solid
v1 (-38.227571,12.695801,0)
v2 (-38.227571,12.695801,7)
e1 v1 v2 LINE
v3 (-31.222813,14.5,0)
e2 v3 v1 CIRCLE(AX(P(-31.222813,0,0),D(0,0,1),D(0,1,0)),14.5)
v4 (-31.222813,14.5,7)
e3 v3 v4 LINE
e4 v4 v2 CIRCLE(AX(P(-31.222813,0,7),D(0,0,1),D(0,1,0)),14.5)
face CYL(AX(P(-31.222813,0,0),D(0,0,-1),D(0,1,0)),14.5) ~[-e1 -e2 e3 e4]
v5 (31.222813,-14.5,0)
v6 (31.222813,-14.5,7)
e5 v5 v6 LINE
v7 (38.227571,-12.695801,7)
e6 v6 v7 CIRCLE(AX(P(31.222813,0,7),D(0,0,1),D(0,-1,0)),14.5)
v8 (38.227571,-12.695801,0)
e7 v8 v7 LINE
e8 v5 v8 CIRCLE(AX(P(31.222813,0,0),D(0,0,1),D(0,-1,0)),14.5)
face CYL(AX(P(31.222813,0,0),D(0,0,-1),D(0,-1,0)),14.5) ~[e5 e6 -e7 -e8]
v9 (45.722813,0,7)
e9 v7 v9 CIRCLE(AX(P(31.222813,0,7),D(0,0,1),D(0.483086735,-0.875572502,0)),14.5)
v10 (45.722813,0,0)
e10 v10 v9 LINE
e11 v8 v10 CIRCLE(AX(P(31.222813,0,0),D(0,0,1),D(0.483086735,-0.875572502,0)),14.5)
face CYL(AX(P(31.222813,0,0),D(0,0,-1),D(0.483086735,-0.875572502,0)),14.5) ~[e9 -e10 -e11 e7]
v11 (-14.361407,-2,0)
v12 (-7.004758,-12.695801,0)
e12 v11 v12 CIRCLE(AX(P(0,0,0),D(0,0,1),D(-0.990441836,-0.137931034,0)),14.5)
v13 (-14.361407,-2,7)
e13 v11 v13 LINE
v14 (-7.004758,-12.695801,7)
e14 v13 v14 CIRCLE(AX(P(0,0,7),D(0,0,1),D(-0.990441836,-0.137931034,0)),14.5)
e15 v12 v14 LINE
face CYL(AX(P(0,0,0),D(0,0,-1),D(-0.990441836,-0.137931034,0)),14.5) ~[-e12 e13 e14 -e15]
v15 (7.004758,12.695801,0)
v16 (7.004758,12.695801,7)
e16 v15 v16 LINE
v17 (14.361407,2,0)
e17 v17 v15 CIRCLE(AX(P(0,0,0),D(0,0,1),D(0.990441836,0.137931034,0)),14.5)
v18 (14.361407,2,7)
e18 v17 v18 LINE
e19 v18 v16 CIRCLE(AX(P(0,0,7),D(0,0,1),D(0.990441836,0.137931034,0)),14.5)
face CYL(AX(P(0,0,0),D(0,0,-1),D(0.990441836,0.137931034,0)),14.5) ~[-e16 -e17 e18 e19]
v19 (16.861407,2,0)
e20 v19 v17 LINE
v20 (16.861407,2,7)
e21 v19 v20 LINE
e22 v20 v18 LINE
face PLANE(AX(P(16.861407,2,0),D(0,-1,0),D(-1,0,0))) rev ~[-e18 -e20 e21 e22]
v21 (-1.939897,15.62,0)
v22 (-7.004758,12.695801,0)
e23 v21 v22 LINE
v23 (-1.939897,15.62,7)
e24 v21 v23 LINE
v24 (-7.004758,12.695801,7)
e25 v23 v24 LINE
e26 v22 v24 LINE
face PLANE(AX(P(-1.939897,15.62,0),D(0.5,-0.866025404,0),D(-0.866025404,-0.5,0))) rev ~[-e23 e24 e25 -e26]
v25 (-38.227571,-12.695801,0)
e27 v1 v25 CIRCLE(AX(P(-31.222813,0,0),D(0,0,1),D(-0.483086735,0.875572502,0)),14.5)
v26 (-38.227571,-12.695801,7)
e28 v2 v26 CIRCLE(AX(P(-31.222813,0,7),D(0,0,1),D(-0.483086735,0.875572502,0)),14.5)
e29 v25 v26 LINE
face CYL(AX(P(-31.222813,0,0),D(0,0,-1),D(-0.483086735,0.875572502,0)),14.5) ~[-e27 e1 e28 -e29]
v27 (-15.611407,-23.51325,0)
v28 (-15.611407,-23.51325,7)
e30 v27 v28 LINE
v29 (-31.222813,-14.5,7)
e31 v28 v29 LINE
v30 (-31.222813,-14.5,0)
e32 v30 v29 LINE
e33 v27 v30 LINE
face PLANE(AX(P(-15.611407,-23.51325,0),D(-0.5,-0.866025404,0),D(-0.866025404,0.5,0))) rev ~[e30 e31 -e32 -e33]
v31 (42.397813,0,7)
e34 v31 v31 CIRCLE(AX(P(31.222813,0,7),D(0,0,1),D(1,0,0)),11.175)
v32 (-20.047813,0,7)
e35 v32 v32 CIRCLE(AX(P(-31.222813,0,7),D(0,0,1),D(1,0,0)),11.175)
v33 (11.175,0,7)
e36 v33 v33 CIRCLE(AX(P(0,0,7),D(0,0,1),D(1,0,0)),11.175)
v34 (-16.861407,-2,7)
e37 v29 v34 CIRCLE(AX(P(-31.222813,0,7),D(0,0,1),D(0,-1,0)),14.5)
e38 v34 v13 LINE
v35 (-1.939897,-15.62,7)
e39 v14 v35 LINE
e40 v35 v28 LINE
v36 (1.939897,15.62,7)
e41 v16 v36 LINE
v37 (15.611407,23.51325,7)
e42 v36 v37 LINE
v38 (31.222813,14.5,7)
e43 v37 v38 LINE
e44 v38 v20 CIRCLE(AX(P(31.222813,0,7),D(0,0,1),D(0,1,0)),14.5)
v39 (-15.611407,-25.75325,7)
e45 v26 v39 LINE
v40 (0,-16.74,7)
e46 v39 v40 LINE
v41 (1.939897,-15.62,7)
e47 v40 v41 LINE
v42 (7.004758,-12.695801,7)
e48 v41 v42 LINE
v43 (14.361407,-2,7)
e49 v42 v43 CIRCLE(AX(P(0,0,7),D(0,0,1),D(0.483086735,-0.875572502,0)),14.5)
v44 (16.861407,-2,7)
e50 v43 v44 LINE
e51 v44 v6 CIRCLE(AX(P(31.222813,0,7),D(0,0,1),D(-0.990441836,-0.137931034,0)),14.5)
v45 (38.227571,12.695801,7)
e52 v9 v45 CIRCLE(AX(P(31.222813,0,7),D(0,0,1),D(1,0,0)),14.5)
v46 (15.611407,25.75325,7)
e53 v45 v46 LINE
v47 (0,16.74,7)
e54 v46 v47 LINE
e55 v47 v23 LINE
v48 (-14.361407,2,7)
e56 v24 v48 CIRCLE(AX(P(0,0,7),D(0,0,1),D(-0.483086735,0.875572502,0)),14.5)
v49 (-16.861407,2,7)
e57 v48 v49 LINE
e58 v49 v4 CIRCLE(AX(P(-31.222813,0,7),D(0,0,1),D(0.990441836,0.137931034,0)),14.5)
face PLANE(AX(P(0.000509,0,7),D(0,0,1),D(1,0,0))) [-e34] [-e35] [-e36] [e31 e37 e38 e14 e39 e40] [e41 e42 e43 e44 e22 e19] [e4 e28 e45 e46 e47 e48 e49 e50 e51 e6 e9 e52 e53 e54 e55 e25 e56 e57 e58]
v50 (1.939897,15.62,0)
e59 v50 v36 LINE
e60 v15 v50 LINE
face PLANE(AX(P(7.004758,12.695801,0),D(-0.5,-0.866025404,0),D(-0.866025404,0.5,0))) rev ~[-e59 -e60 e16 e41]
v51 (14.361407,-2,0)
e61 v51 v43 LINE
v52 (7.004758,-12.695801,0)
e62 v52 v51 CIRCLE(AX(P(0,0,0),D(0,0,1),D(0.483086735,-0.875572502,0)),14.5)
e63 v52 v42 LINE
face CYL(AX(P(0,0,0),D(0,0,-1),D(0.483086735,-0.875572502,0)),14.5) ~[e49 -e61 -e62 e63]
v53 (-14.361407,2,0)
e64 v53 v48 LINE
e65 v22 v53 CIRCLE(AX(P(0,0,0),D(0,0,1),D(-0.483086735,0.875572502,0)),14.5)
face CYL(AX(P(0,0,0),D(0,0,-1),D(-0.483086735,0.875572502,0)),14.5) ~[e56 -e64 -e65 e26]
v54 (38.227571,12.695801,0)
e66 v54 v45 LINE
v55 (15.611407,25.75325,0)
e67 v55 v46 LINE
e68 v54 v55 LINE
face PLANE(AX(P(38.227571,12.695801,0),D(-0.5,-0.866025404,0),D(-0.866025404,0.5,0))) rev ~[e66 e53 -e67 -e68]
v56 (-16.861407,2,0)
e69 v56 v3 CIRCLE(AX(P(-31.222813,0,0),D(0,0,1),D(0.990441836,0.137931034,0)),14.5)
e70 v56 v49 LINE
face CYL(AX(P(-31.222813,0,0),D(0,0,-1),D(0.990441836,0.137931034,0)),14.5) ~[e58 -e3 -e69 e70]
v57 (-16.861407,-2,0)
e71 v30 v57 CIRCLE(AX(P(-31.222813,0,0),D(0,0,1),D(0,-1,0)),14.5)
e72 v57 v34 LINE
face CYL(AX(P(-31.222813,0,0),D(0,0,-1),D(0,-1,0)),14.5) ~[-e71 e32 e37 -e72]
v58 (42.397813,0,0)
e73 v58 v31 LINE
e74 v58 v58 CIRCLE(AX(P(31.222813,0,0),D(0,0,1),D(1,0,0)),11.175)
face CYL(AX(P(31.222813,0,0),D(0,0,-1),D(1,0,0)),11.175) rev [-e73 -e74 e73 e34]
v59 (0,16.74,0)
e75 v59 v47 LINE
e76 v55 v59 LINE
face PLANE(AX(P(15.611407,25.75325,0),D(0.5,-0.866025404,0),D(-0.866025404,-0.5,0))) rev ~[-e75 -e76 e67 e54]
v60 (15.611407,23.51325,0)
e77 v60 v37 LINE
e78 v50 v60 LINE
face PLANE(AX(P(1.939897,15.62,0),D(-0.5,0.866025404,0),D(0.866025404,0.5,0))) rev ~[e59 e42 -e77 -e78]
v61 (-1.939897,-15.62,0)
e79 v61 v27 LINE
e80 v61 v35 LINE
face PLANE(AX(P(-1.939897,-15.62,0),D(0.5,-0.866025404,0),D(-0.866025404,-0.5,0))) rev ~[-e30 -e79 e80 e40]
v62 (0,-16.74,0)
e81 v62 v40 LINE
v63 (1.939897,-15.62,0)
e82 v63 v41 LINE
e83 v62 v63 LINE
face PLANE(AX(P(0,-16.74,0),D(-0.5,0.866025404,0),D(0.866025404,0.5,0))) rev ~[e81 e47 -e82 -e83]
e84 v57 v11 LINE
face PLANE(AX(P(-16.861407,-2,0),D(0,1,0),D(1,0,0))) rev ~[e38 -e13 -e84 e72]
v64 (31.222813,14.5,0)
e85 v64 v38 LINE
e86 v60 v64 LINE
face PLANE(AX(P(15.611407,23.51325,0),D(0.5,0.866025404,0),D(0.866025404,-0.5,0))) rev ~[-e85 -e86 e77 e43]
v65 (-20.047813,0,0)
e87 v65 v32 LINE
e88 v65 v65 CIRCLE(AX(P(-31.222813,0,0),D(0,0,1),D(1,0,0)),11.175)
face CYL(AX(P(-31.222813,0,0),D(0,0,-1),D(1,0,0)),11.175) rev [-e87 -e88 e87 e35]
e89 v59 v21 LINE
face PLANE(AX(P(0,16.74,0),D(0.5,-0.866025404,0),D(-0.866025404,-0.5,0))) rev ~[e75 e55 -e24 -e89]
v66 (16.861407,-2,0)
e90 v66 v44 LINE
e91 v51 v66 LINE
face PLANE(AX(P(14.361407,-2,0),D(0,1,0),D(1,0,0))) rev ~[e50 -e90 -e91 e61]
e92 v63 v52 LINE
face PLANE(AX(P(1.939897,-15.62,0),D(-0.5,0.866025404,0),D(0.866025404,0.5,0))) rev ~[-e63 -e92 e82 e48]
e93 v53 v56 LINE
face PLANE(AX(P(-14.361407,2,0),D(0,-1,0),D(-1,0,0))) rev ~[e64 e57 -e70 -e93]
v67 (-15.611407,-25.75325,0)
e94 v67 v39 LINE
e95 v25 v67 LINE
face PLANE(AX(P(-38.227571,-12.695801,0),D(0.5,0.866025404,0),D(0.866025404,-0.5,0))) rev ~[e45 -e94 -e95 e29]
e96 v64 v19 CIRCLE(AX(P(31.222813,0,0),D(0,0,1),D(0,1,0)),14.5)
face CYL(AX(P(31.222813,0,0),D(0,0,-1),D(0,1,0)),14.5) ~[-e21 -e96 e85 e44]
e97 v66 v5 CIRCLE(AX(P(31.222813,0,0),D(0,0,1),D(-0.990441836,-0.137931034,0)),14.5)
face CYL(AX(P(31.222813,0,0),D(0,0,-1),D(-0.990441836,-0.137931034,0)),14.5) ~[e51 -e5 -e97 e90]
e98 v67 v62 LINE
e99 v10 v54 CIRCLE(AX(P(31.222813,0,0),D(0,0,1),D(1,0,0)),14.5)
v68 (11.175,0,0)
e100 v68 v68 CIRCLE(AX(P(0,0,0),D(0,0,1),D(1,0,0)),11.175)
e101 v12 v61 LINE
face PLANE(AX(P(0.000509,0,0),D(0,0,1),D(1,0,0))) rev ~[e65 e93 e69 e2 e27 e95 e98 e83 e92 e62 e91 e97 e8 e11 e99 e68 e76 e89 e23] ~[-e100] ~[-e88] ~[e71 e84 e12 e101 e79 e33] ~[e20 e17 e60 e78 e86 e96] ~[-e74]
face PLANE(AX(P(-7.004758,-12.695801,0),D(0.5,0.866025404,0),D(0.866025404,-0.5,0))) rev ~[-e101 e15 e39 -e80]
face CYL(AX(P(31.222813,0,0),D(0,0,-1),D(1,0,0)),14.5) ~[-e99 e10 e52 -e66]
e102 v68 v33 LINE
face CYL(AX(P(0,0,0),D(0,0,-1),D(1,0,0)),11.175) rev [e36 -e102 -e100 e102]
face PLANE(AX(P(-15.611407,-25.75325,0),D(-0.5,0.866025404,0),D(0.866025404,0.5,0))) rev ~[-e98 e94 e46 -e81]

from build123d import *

# Parameters (mm, degrees)
F0_R     = 11.175
F1_DEPTH = 7


# Not quite as in the source:
# - a feature names something its author has since deleted; it is built from what else it names


with BuildPart() as f1:
    # F0 (on Top) → F1 (new body)
    with BuildSketch(Plane.XY):
        with BuildLine():
            ThreePointArc((14.3614066163, -2), (14.465310158, -1.0023981402), (14.5, 0))
            ThreePointArc((14.5, 0), (14.465310158, 1.0023981402), (14.3614066163, 2))
            ThreePointArc((14.3614066163, 2), (11.9468943762, 8.2171597748), (7.0047576617, 12.6958012784))
            ThreePointArc((7.0047576617, 12.6958012784), (3.6166891948, 14.0417078473), (0, 14.5))
            ThreePointArc((0, 14.5), (-3.6166891948, 14.0417078473), (-7.0047576617, 12.6958012784))
            ThreePointArc((-7.0047576617, 12.6958012784), (-11.9468943762, 8.2171597748), (-14.3614066163, 2))
            ThreePointArc((-14.3614066163, 2), (-14.5, 0), (-14.3614066163, -2))
            ThreePointArc((-14.3614066163, -2), (-11.9468943762, -8.2171597748), (-7.0047576617, -12.6958012784))
            ThreePointArc((-7.0047576617, -12.6958012784), (-3.6166891948, -14.0417078473), (0, -14.5))
            ThreePointArc((0, -14.5), (3.6166891948, -14.0417078473), (7.0047576617, -12.6958012784))
            ThreePointArc((7.0047576617, -12.6958012784), (11.9468943762, -8.2171597748), (14.3614066163, -2))
        make_face()
        Circle(F0_R, mode=Mode.SUBTRACT)
        with BuildLine():
            ThreePointArc((14.3614066163, 2), (14.465310158, 1.0023981402), (14.5, 0))
            ThreePointArc((14.5, 0), (14.465310158, -1.0023981402), (14.3614066163, -2))
            Line((14.3614066163, -2), (16.8614066163, -2))
            ThreePointArc((16.8614066163, -2), (16.7228132327, 0), (16.8614066163, 2))
            Line((16.8614066163, 2), (14.3614066163, 2))
        make_face()
        with BuildLine():
            ThreePointArc((0, 14.5), (3.6166891948, 14.0417078473), (7.0047576617, 12.6958012784))
            Line((7.0047576617, 12.6958012784), (1.9398969045, 15.62))
            Line((1.9398969045, 15.62), (0, 14.5))
        make_face()
        with BuildLine():
            ThreePointArc((31.2228132327, 14.5), (21.7030968504, 10.9373214271), (16.8614066163, 2))
            ThreePointArc((16.8614066163, 2), (16.7228132327, 0), (16.8614066163, -2))
            ThreePointArc((16.8614066163, -2), (21.7030968504, -10.9373214271), (31.2228132327, -14.5))
            ThreePointArc((31.2228132327, -14.5), (34.8395024275, -14.0417078473), (38.2275708944, -12.6958012784))
            ThreePointArc((38.2275708944, -12.6958012784), (43.709185526, -7.3716013832), (45.7228132327, 0))
            ThreePointArc((45.7228132327, 0), (43.709185526, 7.3716013832), (38.2275708944, 12.6958012784))
            ThreePointArc((38.2275708944, 12.6958012784), (34.8395024275, 14.0417078473), (31.2228132327, 14.5))
        make_face()
        with Locations((31.2228132327, 0)):
            Circle(F0_R, mode=Mode.SUBTRACT)
        with BuildLine():
            Line((1.9398969045, -15.62), (7.0047576617, -12.6958012784))
            ThreePointArc((7.0047576617, -12.6958012784), (3.6166891948, -14.0417078473), (0, -14.5))
            Line((0, -14.5), (1.9398969045, -15.62))
        make_face()
        Polygon((-1.9398969045, 15.62), (0, 14.5), (1.9398969045, 15.62), (0, 16.74), align=None)
        with BuildLine():
            ThreePointArc((-7.0047576617, 12.6958012784), (-3.6166891948, 14.0417078473), (0, 14.5))
            Line((0, 14.5), (-1.9398969045, 15.62))
            Line((-1.9398969045, 15.62), (-7.0047576617, 12.6958012784))
        make_face()
        Polygon((0, 16.74), (1.9398969045, 15.62), (15.6114066163, 23.5132498124), (15.6114066163, 25.7532498124), align=None)
        with BuildLine():
            Line((15.6114066163, 23.5132498124), (31.2228132327, 14.5))
            ThreePointArc((31.2228132327, 14.5), (34.8395024275, 14.0417078473), (38.2275708944, 12.6958012784))
            Line((38.2275708944, 12.6958012784), (15.6114066163, 25.7532498124))
            Line((15.6114066163, 25.7532498124), (15.6114066163, 23.5132498124))
        make_face()
        with BuildLine():
            Line((-1.9398969045, -15.62), (0, -14.5))
            ThreePointArc((0, -14.5), (-3.6166891948, -14.0417078473), (-7.0047576617, -12.6958012784))
            Line((-7.0047576617, -12.6958012784), (-1.9398969045, -15.62))
        make_face()
        Polygon((1.9398969045, -15.62), (0, -14.5), (-1.9398969045, -15.62), (0, -16.74), align=None)
        Polygon((0, -16.74), (-1.9398969045, -15.62), (-15.6114066163, -23.5132498124), (-15.6114066163, -25.7532498124), align=None)
        with BuildLine():
            ThreePointArc((-14.3614066163, -2), (-14.5, 0), (-14.3614066163, 2))
            Line((-14.3614066163, 2), (-16.8614066163, 2))
            ThreePointArc((-16.8614066163, 2), (-16.7575030746, 1.0023981402), (-16.7228132327, 0))
            ThreePointArc((-16.7228132327, 0), (-16.7575030746, -1.0023981402), (-16.8614066163, -2))
            Line((-16.8614066163, -2), (-14.3614066163, -2))
        make_face()
        with BuildLine():
            Line((-15.6114066163, -25.7532498124), (-15.6114066163, -23.5132498124))
            Line((-15.6114066163, -23.5132498124), (-31.2228132327, -14.5))
            ThreePointArc((-31.2228132327, -14.5), (-34.8395024275, -14.0417078473), (-38.2275708944, -12.6958012784))
            Line((-38.2275708944, -12.6958012784), (-15.6114066163, -25.7532498124))
        make_face()
        with BuildLine():
            ThreePointArc((-16.7228132327, 0), (-16.7575030746, 1.0023981402), (-16.8614066163, 2))
            ThreePointArc((-16.8614066163, 2), (-21.7030968504, 10.9373214271), (-31.2228132327, 14.5))
            ThreePointArc((-31.2228132327, 14.5), (-34.8395024275, 14.0417078473), (-38.2275708944, 12.6958012784))
            ThreePointArc((-38.2275708944, 12.6958012784), (-45.7228132327, 0), (-38.2275708944, -12.6958012784))
            ThreePointArc((-38.2275708944, -12.6958012784), (-34.8395024275, -14.0417078473), (-31.2228132327, -14.5))
            ThreePointArc((-31.2228132327, -14.5), (-21.7030968504, -10.9373214271), (-16.8614066163, -2))
            ThreePointArc((-16.8614066163, -2), (-16.7575030746, -1.0023981402), (-16.7228132327, 0))
        make_face()
        with Locations((-31.2228132327, 0)):
            Circle(F0_R, mode=Mode.SUBTRACT)
    extrude(amount=F1_DEPTH)


solid = f1.part
